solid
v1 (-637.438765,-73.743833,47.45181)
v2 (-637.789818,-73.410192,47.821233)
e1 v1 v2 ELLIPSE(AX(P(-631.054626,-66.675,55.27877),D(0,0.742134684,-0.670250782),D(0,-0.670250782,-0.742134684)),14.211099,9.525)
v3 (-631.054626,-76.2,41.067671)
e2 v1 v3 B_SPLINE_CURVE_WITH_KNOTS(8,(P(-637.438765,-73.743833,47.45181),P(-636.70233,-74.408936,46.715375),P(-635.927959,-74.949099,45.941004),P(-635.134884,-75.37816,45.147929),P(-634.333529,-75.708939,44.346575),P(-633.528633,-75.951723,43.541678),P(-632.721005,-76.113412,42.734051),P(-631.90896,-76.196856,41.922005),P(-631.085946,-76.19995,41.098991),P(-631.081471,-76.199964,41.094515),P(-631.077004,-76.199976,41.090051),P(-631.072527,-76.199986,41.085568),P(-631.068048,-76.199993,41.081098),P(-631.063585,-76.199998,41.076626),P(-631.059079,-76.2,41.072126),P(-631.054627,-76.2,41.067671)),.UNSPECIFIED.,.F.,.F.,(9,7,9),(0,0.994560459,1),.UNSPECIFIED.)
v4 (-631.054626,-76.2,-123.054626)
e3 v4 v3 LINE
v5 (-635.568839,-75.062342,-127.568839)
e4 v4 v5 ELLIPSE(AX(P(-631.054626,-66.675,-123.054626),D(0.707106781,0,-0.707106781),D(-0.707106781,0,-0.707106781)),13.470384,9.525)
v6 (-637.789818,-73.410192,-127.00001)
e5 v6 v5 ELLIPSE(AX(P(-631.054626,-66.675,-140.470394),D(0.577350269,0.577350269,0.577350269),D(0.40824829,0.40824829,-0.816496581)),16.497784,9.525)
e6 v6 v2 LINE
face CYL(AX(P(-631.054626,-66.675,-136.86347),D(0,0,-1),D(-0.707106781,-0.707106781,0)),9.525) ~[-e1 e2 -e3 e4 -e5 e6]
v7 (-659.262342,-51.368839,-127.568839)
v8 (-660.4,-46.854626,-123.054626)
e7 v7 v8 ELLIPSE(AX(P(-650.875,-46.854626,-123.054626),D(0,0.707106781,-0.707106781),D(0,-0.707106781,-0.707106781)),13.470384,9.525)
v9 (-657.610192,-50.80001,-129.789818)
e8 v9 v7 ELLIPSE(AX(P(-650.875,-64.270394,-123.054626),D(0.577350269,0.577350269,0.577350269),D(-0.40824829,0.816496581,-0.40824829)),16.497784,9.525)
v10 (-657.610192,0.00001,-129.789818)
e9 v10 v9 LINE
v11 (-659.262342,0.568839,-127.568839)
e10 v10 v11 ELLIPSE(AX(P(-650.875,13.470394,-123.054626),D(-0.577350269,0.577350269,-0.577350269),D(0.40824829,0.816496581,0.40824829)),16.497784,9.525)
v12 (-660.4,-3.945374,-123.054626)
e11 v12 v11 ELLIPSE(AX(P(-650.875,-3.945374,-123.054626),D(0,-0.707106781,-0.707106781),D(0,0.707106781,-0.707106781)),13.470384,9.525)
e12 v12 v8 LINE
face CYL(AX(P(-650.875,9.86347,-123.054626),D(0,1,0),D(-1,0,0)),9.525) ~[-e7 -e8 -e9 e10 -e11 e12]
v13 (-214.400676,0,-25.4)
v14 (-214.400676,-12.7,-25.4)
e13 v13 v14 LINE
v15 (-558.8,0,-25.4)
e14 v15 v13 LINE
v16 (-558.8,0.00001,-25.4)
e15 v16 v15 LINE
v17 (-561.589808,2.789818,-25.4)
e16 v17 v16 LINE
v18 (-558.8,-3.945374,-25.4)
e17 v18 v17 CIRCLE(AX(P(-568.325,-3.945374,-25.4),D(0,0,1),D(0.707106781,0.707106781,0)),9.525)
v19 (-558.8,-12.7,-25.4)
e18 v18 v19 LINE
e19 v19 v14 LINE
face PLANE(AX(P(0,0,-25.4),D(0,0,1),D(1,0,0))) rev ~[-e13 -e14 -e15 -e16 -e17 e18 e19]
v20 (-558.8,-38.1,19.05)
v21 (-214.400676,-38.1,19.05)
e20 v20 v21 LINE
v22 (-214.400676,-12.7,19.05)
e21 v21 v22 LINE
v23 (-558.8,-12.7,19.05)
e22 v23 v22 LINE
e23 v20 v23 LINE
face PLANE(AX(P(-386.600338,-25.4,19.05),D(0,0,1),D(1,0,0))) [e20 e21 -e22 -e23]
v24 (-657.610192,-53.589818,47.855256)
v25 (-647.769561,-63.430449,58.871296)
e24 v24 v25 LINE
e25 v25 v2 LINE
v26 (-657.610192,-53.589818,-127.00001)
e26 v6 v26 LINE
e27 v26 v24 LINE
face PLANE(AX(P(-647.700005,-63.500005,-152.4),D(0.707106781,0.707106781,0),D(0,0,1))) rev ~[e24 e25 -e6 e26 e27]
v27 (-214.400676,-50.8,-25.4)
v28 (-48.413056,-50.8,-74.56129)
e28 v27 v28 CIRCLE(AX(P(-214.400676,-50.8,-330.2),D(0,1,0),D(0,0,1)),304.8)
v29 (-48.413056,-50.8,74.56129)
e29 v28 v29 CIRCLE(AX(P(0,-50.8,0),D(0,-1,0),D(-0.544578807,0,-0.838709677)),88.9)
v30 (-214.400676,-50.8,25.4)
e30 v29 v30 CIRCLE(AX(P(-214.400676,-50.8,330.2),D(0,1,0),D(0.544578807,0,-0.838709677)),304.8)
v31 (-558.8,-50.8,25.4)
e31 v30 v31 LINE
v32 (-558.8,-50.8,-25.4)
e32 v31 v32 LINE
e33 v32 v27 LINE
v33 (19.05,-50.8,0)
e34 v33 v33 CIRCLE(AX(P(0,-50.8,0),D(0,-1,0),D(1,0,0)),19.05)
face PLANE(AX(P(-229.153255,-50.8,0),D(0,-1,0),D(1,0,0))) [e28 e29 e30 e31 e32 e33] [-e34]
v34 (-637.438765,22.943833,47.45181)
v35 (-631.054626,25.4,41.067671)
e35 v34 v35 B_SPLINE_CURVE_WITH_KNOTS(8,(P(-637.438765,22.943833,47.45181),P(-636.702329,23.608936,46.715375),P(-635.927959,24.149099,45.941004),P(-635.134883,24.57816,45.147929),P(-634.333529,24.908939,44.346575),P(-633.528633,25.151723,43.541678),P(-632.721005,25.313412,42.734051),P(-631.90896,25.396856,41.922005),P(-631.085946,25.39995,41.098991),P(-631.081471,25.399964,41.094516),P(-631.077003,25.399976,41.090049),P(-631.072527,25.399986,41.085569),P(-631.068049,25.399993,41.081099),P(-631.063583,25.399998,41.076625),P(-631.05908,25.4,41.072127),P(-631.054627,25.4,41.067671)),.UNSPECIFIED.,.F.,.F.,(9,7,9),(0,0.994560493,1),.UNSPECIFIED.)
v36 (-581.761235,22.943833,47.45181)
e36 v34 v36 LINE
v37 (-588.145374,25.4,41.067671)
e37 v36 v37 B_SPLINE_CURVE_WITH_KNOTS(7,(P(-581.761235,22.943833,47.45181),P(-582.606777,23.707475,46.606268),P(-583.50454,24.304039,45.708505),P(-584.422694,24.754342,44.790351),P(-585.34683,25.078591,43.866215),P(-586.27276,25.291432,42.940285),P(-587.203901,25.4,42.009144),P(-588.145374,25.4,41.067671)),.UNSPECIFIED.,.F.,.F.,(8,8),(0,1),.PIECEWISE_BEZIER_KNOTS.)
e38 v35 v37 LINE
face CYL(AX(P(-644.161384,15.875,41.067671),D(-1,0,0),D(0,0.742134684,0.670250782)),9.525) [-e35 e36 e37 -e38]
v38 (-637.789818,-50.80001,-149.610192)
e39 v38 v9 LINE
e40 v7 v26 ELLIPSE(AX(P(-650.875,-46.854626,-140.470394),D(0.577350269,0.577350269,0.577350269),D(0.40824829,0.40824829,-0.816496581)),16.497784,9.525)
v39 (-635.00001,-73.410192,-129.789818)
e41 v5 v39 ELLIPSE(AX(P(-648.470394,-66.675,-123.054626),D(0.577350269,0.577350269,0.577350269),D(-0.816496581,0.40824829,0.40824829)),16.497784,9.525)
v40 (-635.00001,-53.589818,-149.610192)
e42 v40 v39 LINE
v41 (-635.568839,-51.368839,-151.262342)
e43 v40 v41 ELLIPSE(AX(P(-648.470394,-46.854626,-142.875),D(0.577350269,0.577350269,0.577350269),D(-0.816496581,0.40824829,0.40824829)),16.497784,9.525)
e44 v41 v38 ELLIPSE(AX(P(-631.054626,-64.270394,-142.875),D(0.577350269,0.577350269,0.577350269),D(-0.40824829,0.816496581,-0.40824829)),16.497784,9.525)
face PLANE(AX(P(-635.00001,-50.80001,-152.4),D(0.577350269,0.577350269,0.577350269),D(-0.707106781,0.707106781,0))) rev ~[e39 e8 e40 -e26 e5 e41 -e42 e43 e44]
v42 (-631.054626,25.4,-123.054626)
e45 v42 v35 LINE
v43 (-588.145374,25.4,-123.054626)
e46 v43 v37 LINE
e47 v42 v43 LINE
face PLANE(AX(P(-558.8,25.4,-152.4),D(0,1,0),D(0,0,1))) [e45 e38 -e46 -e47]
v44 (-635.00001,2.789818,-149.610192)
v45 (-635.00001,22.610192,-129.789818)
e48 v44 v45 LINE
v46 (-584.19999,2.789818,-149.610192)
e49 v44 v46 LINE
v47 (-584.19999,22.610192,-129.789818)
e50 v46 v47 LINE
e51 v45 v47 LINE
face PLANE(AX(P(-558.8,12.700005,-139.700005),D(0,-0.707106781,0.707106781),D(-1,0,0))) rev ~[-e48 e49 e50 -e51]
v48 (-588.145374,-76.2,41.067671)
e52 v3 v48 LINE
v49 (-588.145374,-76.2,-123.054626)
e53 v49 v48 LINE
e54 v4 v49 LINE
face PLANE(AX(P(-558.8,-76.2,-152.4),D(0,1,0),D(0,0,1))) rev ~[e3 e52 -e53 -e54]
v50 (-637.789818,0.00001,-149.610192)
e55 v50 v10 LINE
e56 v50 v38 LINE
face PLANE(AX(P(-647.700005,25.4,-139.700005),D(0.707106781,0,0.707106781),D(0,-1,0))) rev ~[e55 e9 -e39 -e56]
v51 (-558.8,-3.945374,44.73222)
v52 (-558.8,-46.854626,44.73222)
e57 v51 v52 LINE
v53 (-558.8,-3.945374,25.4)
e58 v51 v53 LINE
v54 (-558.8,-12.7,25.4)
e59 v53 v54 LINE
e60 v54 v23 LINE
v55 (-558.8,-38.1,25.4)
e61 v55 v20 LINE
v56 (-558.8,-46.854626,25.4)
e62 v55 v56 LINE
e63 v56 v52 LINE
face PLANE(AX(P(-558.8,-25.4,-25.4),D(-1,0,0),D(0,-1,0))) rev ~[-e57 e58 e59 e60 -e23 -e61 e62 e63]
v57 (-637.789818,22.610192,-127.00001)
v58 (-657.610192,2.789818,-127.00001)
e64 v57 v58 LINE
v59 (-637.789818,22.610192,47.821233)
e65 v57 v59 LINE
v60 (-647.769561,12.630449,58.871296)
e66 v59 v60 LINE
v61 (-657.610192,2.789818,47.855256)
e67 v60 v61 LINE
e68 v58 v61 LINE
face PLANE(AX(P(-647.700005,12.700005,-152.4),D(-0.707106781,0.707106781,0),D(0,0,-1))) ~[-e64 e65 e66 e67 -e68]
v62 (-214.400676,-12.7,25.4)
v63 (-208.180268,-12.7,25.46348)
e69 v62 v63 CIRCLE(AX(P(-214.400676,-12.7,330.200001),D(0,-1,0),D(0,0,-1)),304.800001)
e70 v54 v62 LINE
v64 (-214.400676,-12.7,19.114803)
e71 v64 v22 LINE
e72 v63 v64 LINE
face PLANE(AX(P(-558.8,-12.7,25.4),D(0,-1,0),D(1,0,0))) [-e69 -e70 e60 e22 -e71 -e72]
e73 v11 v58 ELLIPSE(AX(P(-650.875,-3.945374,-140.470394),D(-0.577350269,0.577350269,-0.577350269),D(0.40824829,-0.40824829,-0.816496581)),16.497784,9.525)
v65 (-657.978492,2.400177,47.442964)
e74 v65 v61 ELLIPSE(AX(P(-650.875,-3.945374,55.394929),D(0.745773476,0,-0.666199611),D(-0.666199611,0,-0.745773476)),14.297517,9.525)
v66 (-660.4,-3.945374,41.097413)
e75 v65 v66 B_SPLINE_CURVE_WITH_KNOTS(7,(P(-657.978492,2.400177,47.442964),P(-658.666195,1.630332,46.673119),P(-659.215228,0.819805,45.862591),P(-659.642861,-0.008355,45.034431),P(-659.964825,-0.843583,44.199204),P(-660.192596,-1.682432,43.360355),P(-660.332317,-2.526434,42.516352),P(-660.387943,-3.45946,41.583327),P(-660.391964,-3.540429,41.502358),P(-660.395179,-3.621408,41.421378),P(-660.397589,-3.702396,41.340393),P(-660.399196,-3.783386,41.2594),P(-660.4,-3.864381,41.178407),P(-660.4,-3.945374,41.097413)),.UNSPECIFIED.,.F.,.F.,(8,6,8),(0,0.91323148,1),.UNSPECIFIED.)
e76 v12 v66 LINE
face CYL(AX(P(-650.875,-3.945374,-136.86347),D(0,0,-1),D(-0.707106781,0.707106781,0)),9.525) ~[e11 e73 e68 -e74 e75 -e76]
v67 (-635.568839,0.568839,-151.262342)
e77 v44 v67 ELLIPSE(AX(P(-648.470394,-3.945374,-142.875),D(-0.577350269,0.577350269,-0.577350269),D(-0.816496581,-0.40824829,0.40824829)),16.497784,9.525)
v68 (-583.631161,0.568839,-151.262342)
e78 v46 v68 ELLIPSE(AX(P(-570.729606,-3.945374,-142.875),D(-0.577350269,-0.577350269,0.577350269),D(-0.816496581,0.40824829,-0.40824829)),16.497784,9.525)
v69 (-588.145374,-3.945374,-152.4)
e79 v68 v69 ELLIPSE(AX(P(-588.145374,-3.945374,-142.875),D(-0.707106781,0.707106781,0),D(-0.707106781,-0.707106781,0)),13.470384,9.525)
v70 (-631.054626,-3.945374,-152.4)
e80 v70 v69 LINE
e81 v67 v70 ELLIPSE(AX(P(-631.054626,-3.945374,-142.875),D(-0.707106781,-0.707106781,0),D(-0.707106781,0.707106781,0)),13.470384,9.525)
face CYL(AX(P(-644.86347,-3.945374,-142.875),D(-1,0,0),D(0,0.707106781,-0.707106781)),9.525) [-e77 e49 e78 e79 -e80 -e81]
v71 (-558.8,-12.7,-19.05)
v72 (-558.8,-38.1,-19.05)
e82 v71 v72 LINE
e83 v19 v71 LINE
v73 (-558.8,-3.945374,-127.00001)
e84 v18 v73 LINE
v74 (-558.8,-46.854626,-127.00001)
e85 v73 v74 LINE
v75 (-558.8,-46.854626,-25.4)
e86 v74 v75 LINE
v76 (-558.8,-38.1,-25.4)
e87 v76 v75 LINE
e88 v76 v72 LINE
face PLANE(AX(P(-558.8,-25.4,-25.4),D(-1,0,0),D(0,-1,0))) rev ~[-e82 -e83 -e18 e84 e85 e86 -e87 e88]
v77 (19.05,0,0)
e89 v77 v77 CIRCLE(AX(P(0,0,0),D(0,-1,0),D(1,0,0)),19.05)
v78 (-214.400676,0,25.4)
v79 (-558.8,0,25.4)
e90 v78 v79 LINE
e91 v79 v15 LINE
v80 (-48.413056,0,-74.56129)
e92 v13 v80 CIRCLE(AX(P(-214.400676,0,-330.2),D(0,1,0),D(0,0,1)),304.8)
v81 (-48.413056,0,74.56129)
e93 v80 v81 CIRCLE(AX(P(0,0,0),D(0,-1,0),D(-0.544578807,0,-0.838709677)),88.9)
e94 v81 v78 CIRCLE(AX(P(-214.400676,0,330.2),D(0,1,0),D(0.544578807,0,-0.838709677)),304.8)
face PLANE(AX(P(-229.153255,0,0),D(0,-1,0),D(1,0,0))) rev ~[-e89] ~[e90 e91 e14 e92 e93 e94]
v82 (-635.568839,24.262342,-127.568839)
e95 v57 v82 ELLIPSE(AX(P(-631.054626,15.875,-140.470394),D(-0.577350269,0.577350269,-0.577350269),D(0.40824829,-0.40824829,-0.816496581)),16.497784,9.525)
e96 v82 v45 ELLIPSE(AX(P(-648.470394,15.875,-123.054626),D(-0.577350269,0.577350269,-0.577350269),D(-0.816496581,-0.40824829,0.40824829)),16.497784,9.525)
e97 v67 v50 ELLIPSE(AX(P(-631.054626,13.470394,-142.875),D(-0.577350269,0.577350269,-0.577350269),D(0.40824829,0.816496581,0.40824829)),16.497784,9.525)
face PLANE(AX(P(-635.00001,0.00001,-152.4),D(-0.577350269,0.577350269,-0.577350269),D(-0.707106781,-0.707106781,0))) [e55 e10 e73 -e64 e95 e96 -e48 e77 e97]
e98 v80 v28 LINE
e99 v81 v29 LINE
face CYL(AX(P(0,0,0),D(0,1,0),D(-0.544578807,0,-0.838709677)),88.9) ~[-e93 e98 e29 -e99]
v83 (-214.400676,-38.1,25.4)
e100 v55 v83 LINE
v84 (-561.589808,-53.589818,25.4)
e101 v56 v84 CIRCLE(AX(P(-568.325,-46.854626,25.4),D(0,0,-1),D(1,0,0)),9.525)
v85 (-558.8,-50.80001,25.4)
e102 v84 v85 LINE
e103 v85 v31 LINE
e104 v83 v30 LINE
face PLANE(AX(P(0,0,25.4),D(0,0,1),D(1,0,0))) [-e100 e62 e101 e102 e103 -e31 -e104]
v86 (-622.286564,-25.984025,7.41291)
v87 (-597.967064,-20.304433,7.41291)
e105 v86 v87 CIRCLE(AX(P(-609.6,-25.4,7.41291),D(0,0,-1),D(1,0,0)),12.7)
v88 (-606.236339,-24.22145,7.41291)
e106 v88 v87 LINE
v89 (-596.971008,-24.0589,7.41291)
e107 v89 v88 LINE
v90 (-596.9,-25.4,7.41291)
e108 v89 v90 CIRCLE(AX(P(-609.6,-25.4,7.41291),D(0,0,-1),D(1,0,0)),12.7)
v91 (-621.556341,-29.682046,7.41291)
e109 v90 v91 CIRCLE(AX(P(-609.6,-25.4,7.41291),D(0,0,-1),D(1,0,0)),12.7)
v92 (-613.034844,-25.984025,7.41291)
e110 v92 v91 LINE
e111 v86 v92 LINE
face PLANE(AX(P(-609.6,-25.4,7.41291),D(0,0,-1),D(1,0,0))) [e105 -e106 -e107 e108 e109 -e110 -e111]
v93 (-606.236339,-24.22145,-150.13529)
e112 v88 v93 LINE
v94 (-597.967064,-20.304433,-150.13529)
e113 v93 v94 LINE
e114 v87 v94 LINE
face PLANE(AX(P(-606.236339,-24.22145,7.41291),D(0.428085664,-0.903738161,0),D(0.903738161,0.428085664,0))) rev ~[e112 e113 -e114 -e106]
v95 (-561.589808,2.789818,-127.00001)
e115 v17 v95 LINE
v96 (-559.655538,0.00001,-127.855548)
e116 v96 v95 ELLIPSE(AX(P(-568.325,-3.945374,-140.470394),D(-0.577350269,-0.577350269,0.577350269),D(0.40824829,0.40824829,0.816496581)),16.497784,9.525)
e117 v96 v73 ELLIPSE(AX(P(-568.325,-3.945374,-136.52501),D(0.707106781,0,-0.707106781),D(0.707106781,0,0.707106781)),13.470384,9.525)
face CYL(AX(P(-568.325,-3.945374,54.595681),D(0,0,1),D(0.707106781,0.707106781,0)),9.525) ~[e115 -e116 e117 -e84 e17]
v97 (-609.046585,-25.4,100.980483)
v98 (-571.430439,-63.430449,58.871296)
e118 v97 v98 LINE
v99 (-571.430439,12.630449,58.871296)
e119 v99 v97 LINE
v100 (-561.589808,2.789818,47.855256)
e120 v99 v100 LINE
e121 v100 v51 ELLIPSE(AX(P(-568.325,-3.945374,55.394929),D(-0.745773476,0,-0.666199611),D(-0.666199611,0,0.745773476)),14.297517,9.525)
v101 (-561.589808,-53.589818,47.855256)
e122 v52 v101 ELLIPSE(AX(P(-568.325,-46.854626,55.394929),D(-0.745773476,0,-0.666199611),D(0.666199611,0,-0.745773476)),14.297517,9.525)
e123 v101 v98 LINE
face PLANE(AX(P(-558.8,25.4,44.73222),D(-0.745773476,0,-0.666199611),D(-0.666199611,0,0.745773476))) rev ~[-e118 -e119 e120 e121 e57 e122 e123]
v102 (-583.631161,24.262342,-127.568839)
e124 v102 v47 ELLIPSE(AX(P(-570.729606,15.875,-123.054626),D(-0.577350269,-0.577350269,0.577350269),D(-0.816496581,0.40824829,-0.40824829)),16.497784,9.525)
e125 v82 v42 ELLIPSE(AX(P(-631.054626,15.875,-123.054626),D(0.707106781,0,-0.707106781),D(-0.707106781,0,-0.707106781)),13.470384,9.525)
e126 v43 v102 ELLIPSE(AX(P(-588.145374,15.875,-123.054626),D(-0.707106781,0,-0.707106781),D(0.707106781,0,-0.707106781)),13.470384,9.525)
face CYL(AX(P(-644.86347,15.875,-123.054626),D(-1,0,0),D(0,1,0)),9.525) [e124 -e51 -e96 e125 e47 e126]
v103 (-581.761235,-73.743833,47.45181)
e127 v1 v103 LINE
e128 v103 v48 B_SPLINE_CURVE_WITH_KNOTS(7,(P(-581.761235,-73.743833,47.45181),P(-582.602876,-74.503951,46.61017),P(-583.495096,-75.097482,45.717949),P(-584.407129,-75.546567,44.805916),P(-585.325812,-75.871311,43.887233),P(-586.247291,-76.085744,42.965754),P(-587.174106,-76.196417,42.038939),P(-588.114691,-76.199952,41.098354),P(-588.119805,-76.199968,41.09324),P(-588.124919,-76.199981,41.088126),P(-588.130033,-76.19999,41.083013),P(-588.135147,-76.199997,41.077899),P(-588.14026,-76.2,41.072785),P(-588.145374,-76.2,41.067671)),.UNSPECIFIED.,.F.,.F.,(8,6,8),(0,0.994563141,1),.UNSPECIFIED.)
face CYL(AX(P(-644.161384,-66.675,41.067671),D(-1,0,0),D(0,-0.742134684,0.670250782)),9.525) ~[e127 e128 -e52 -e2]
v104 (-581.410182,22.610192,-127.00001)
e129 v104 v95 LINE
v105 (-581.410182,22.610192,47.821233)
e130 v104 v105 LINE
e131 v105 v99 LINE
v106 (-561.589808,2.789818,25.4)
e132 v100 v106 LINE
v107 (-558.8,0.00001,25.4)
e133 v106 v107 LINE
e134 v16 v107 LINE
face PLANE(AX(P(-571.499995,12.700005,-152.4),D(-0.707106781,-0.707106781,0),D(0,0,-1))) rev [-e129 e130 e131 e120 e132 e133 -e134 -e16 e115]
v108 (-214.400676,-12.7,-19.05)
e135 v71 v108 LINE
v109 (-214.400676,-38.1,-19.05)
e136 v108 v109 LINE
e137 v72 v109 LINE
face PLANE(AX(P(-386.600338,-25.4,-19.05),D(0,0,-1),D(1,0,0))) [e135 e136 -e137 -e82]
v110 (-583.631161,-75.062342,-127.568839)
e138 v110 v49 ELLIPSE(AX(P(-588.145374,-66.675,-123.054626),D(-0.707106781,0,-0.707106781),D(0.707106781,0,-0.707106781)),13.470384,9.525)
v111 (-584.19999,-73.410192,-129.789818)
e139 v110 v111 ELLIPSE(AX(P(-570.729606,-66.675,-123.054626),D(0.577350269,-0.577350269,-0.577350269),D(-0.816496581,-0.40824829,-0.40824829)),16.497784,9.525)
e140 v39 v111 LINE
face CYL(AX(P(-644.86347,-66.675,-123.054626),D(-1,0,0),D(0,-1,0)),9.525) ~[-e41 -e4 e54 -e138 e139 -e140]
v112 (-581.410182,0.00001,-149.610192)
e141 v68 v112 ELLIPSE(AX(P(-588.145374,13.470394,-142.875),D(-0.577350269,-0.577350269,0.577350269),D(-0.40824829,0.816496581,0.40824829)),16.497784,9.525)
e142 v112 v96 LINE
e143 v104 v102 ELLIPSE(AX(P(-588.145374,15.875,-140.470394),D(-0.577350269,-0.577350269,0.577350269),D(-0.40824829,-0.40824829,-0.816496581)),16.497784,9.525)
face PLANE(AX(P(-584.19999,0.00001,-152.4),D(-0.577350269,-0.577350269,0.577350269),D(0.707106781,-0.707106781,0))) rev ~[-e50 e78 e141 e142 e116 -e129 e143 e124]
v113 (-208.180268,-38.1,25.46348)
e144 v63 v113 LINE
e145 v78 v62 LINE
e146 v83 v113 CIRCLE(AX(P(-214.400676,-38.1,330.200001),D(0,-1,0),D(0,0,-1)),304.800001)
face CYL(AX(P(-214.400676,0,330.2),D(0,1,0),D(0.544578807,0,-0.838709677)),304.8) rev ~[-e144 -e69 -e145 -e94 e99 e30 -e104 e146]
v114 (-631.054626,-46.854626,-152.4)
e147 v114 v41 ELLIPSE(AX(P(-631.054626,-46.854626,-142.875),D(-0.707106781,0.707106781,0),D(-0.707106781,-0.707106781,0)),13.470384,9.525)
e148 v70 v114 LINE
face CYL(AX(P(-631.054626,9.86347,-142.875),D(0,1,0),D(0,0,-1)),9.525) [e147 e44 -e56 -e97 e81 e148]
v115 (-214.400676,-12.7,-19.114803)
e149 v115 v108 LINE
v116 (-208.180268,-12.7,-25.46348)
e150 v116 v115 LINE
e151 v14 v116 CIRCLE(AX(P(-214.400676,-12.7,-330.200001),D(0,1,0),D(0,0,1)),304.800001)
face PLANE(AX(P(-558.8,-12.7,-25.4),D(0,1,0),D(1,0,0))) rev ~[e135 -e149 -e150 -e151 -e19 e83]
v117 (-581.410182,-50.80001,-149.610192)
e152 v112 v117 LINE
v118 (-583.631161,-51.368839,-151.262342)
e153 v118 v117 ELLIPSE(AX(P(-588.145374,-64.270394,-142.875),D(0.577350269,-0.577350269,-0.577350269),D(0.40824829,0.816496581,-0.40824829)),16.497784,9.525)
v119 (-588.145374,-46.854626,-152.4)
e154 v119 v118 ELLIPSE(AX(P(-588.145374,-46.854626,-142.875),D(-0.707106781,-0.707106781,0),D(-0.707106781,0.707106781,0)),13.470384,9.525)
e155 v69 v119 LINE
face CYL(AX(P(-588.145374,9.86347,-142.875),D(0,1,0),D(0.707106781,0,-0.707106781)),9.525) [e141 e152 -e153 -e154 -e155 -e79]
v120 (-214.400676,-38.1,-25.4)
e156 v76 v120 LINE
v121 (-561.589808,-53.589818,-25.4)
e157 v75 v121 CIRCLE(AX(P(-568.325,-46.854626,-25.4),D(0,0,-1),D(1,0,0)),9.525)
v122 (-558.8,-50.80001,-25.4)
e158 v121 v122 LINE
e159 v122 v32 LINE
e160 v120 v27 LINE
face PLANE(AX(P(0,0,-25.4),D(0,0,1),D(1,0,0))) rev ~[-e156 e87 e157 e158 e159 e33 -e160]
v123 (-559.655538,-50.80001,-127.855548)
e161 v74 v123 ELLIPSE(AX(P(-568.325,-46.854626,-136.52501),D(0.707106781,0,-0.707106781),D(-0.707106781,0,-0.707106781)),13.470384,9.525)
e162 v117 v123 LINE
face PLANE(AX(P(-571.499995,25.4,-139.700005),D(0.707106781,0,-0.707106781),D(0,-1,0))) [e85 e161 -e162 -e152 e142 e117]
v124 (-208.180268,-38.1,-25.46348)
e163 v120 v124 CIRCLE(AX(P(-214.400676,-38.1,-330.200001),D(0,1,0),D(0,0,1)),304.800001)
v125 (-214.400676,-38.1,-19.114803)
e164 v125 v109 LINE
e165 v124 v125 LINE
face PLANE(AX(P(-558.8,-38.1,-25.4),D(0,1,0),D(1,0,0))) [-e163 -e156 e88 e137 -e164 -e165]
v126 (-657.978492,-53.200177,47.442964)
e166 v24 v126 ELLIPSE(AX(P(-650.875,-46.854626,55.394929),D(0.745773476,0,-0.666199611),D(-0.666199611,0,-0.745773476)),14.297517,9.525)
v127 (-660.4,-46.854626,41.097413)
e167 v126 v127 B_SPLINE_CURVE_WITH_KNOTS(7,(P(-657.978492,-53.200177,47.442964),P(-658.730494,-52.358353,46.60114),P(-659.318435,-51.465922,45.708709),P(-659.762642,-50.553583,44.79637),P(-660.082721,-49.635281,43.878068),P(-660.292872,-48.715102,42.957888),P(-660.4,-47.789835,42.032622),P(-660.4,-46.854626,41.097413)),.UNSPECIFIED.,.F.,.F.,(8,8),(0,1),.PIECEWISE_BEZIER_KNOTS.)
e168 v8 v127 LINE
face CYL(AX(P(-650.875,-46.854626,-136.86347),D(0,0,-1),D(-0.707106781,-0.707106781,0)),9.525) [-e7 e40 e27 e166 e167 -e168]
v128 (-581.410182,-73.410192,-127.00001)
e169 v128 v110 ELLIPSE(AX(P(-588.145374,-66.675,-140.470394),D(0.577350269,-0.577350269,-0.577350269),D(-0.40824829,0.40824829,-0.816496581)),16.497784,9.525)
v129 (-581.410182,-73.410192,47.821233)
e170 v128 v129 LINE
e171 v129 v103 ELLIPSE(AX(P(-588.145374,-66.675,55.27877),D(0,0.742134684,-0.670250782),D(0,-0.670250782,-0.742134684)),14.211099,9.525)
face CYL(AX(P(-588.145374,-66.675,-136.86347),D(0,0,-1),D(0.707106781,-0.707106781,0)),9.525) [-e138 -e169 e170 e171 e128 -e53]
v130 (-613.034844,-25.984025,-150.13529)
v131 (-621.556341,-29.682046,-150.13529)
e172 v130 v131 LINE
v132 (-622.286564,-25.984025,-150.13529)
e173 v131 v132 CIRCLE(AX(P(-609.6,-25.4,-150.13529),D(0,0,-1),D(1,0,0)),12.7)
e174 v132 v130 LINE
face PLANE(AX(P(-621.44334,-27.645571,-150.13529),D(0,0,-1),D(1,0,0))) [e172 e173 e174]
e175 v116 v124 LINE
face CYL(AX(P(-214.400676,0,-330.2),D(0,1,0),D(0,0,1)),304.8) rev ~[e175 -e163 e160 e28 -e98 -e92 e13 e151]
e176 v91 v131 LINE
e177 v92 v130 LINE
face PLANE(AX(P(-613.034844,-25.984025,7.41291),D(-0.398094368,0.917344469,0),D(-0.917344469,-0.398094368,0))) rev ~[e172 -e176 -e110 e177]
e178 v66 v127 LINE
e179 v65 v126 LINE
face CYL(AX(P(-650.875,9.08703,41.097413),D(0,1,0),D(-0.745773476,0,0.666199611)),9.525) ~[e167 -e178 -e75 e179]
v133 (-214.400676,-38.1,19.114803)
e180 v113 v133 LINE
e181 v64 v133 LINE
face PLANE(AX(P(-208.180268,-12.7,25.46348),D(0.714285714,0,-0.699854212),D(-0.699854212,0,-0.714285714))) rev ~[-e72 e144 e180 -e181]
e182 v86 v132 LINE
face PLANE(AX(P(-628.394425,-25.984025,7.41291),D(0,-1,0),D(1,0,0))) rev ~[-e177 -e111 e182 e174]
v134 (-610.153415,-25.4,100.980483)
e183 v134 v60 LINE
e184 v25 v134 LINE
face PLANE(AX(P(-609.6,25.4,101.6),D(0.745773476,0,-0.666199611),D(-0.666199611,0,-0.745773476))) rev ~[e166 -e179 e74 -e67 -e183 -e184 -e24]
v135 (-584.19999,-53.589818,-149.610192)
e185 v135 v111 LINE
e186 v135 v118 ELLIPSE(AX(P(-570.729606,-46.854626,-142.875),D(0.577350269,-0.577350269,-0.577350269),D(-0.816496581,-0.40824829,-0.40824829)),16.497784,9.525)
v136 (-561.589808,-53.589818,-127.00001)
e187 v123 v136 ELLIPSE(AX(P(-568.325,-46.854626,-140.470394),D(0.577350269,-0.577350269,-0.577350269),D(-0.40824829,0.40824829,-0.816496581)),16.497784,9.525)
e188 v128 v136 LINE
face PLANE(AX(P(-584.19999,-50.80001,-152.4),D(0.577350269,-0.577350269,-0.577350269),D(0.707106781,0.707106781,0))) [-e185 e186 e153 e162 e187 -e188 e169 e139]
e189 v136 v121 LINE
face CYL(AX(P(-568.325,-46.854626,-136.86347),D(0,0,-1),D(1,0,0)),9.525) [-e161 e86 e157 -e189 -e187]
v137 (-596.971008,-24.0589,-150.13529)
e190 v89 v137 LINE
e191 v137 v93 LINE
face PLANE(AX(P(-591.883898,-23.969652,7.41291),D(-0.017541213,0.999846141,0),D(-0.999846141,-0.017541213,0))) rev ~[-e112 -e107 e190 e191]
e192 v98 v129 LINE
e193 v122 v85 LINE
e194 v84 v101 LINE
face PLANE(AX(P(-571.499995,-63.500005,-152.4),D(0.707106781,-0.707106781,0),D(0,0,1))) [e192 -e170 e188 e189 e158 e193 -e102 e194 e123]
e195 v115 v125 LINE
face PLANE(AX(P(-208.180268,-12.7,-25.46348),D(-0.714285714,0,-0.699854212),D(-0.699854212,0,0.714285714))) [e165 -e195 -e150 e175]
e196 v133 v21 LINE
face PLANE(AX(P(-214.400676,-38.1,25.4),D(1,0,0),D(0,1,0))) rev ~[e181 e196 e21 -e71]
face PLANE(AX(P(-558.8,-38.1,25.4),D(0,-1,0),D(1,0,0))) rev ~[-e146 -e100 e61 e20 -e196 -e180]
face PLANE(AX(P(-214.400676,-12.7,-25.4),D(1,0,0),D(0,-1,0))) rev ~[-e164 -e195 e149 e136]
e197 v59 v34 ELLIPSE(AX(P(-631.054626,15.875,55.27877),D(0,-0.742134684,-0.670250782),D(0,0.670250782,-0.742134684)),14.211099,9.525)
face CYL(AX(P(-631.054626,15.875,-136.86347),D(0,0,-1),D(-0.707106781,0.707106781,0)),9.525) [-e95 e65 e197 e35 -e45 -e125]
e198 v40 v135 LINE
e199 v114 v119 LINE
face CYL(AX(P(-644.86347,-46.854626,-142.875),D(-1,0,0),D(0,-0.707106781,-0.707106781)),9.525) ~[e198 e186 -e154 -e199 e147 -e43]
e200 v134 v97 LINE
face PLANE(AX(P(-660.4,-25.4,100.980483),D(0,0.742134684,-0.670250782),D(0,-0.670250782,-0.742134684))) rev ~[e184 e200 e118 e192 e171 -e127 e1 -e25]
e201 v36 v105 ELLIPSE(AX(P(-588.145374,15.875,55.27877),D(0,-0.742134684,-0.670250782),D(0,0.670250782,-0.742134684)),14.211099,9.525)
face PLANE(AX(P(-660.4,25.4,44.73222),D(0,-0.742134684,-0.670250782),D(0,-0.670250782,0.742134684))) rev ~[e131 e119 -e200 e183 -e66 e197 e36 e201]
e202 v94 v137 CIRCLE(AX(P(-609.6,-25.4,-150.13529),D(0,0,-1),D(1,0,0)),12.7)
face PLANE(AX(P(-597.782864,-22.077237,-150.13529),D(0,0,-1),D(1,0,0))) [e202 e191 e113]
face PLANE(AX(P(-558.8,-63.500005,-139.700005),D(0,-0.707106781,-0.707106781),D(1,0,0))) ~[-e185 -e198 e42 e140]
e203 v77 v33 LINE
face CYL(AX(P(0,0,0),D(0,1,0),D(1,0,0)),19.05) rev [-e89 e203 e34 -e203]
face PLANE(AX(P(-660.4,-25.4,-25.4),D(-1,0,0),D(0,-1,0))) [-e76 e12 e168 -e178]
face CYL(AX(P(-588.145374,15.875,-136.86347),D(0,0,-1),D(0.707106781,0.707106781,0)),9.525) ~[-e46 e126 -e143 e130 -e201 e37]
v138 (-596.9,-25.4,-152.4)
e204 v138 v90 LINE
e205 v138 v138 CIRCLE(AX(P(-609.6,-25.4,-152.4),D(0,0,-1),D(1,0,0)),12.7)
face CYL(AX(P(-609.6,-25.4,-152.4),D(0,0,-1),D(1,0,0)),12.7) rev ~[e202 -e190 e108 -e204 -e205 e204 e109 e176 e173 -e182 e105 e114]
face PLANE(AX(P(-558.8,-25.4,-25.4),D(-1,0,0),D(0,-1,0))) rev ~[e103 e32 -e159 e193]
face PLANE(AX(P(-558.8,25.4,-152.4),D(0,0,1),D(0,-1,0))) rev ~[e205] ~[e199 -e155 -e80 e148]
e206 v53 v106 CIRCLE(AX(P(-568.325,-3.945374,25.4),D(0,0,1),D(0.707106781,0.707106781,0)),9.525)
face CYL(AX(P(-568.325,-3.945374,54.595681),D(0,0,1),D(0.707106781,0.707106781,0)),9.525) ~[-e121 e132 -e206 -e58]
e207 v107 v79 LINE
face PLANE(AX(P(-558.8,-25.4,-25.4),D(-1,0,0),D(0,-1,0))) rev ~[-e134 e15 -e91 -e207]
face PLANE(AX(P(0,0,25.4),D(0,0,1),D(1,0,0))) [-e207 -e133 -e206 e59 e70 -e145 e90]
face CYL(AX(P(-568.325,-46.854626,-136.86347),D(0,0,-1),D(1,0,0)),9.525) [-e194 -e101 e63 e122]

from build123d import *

# Parameters (mm, degrees)
F0_R          = 19.05
F1_DEPTH      = 50.8
F2_W          = 101.6
F2_H          = 254
F3_DEPTH      = 101.6
F5_DEPTH      = 150.00483
F7_DEPTH      = 133.96625
F8_SIZE       = 25.39999
F9_T1_DEPTH   = 70.526940908
F9_T3_DEPTH   = 70.526940908
F10_T1_DEPTH  = 69.1227672529
F10_T3_DEPTH  = 191.4591513789
F10_T5_DEPTH  = 70.526940908
F10_T7_DEPTH  = 68.974059705
F10_T9_DEPTH  = 70.526940908
F11_T4_DEPTH  = 191.4591513789
F11_T9_DEPTH  = 191.4591513789
F11_T14_DEPTH = 191.4591513789
F11_T19_DEPTH = 191.4591513789
F13_R         = 12.7
F14_DEPTH     = 159.81291
F15_W         = 344.3993236951
F15_H         = 25.4
F16_DEPTH     = 6.35
F17_W         = 344.3993236951
F17_H         = 25.4
F18_DEPTH     = 6.35
F19_T1_DEPTH  = 25.4
F21_DEPTH     = 157.5482


# Not quite as in the source:
# - a fillet or chamfer that OpenCascade refuses, or shapes differently, is made with other operations: its cross-section is extruded or revolved along the edge and cut away or added
# - a fillet or chamfer is up to 0.001 mm smaller than in the source, because OpenCascade refuses the exact size
# - a feature of the source that left no trace in its solid (it failed there, or was rolled back) is left out


with BuildPart() as f1:
    # F0 (on Front) → F1 (new body)
    with BuildSketch(Plane.XZ):
        with BuildLine():
            ThreePointArc((-214.4006763049, -25.4), (-127.8432927657, -37.9486366929), (-48.4130559398, -74.5612903226))
            ThreePointArc((-48.4130559398, -74.5612903226), (88.9, 0), (-48.4130559398, 74.5612903226))
            ThreePointArc((-48.4130559398, 74.5612903226), (-127.8432927657, 37.9486366929), (-214.4006763049, 25.4))
            Line((-214.4006763049, 25.4), (-558.8, 25.4))
            Line((-558.8, 25.4), (-558.8, -25.4))
            Line((-558.8, -25.4), (-214.4006763049, -25.4))
        make_face()
        Circle(F0_R, mode=Mode.SUBTRACT)
    extrude(amount=F1_DEPTH)

    # F2 (on face) → F3 (join)
    with BuildSketch(Plane(origin=(-558.8, 0, 0), x_dir=(0, -1, 0), z_dir=(-1, 0, 0))):
        with Locations((25.4, -25.4)):
            Rectangle(F2_W, F2_H)
    extrude(amount=F3_DEPTH)

    # F4 (on face) → F5 (cut)
    with BuildSketch(Plane(origin=(0, 25.4, 0), x_dir=(-1, 0, 0), z_dir=(0, 1, 0))):
        Polygon((534.5858503342, 124.7548833489), (558.8, 44.7322204709), (609.6, 101.6), (660.4, 44.7322204709), (660.4, 124.7548833489), align=None)
    extrude(amount=-F5_DEPTH, mode=Mode.SUBTRACT)

    # F6 (on face) → F7 (cut)
    with BuildSketch(Plane(origin=(-660.4, 0, 0), x_dir=(0, -1, 0), z_dir=(-1, 0, 0))):
        Polygon((-36.009144038, 107.4853688478), (-25.4, 44.7322204709), (25.4, 100.9804829955), (76.2, 44.7322204709), (85.7249945402, 107.4853688478), align=None)
    extrude(amount=-F7_DEPTH, mode=Mode.SUBTRACT)

    # F8 (size 25.4 in the source; OpenCascade refuses exactly that, so slightly less here)
    f8_edges = [f1.edges().sort_by_distance(p)[0] for p in [
        (-660.4, -76.2, -53.83389),
        (-558.8, -76.2, -53.83389),
        (-558.8, 25.4, -53.83389),
        (-660.4, 25.4, -53.83389),
        (-609.6, 25.4, -152.4),
        (-609.6, -76.2, -152.4),
        (-558.8, -25.4, -152.4),
        (-660.4, -25.4, -152.4),
    ]]
    chamfer(f8_edges, length=F8_SIZE)

    # F9: fillet of radius 9.525 on 4 edges, made by hand

    # F9_s2 → F9_t1 (cut)
    with BuildSketch(Plane.YZ.offset(-644.863470454)):
        with BuildLine():
            ThreePointArc((2.7898179092, -149.6101920908), (-0.3003144883, -151.6749525472), (-3.9453741816, -152.4))
            Line((-3.9453741816, -152.4), (1e-05, -152.4))
            Line((1e-05, -152.4), (2.7898179092, -149.6101920908))
        make_face()
        with BuildLine():
            ThreePointArc((-53.5898179092, -149.6101920908), (-50.4996855117, -151.6749525472), (-46.8546258184, -152.4))
            Line((-46.8546258184, -152.4), (-50.80001, -152.4))
            Line((-50.80001, -152.4), (-53.5898179092, -149.6101920908))
        make_face()
    extrude(amount=F9_T1_DEPTH, mode=Mode.SUBTRACT)

    # F9_s4 → F9_t3 (cut)
    with BuildSketch(Plane.XZ.offset(-9.863470454)):
        with BuildLine():
            ThreePointArc((-581.4101820908, -149.6101920908), (-584.5003144883, -151.6749525472), (-588.1453741816, -152.4))
            Line((-588.1453741816, -152.4), (-584.19999, -152.4))
            Line((-584.19999, -152.4), (-581.4101820908, -149.6101920908))
        make_face()
        with BuildLine():
            ThreePointArc((-631.0546258184, -152.4), (-634.6996855117, -151.6749525472), (-637.7898179092, -149.6101920908))
            Line((-637.7898179092, -149.6101920908), (-635.00001, -152.4))
            Line((-635.00001, -152.4), (-631.0546258184, -152.4))
        make_face()
    extrude(amount=F9_T3_DEPTH, mode=Mode.SUBTRACT)

    # F10: fillet of radius 9.525 on 12 edges, made by hand

    # F10_s2 → F10_t1 (cut)
    with BuildSketch(Plane.YZ.offset(-644.1613836265)):
        with BuildLine():
            ThreePointArc((-73.7438328649, 47.4518097193), (-75.5647766574, 44.4878312477), (-76.2, 41.0676710203))
            Line((-76.2, 41.0676710203), (-76.2, 44.7322204709))
            Line((-76.2, 44.7322204709), (-73.7438328649, 47.4518097193))
        make_face()
        with BuildLine():
            ThreePointArc((22.9438328649, 47.4518097193), (24.7647766574, 44.4878312477), (25.4, 41.0676710203))
            Line((25.4, 41.0676710203), (25.4, 44.7322204709))
            Line((25.4, 44.7322204709), (22.9438328649, 47.4518097193))
        make_face()
    extrude(amount=F10_T1_DEPTH, mode=Mode.SUBTRACT)

    # F10_s4 → F10_t3 (cut)
    with BuildSketch(Plane.XY.offset(-136.863470454)):
        with BuildLine():
            ThreePointArc((-637.7898179092, -73.4101920908), (-634.6996855117, -75.4749525472), (-631.0546258184, -76.2))
            Line((-631.0546258184, -76.2), (-635.00001, -76.2))
            Line((-635.00001, -76.2), (-637.7898179092, -73.4101920908))
        make_face()
        with BuildLine():
            ThreePointArc((-581.4101820908, -73.4101920908), (-584.5003144883, -75.4749525472), (-588.1453741816, -76.2))
            Line((-588.1453741816, -76.2), (-584.19999, -76.2))
            Line((-584.19999, -76.2), (-581.4101820908, -73.4101920908))
        make_face()
        with BuildLine():
            ThreePointArc((-637.7898179092, 22.6101920908), (-634.6996855117, 24.6749525472), (-631.0546258184, 25.4))
            Line((-631.0546258184, 25.4), (-635.00001, 25.4))
            Line((-635.00001, 25.4), (-637.7898179092, 22.6101920908))
        make_face()
        with BuildLine():
            ThreePointArc((-581.4101820908, 22.6101920908), (-584.5003144883, 24.6749525472), (-588.1453741816, 25.4))
            Line((-588.1453741816, 25.4), (-584.19999, 25.4))
            Line((-584.19999, 25.4), (-581.4101820908, 22.6101920908))
        make_face()
        with BuildLine():
            ThreePointArc((-657.6101920908, 2.7898179092), (-659.6749525472, -0.3003144883), (-660.4, -3.9453741816))
            Line((-660.4, -3.9453741816), (-660.4, 1e-05))
            Line((-660.4, 1e-05), (-657.6101920908, 2.7898179092))
        make_face()
        with BuildLine():
            ThreePointArc((-657.6101920908, -53.5898179092), (-659.6749525472, -50.4996855117), (-660.4, -46.8546258184))
            Line((-660.4, -46.8546258184), (-660.4, -50.80001))
            Line((-660.4, -50.80001), (-657.6101920908, -53.5898179092))
        make_face()
    extrude(amount=F10_T3_DEPTH, mode=Mode.SUBTRACT)

    # F10_s6 → F10_t5 (cut)
    with BuildSketch(Plane.YZ.offset(-644.863470454)):
        with BuildLine():
            ThreePointArc((-76.2, -123.0546258184), (-75.4749525472, -126.6996855117), (-73.4101920908, -129.7898179092))
            Line((-73.4101920908, -129.7898179092), (-76.2, -127.00001))
            Line((-76.2, -127.00001), (-76.2, -123.0546258184))
        make_face()
        with BuildLine():
            ThreePointArc((25.4, -123.0546258184), (24.6749525472, -126.6996855117), (22.6101920908, -129.7898179092))
            Line((22.6101920908, -129.7898179092), (25.4, -127.00001))
            Line((25.4, -127.00001), (25.4, -123.0546258184))
        make_face()
    extrude(amount=F10_T5_DEPTH, mode=Mode.SUBTRACT)

    # F10_s8 → F10_t7 (cut)
    with BuildSketch(Plane.XZ.offset(-9.0870298525)):
        with BuildLine():
            ThreePointArc((-657.9784923634, 47.4429638254), (-659.7740558421, 44.4933557154), (-660.4, 41.0974125299))
            Line((-660.4, 41.0974125299), (-660.4, 44.7322204709))
            Line((-660.4, 44.7322204709), (-657.9784923634, 47.4429638254))
        make_face()
    extrude(amount=F10_T7_DEPTH, mode=Mode.SUBTRACT)

    # F10_s10 → F10_t9 (cut)
    with BuildSketch(Plane.XZ.offset(-9.863470454)):
        with BuildLine():
            ThreePointArc((-660.4, -123.0546258184), (-659.6749525472, -126.6996855117), (-657.6101920908, -129.7898179092))
            Line((-657.6101920908, -129.7898179092), (-660.4, -127.00001))
            Line((-660.4, -127.00001), (-660.4, -123.0546258184))
        make_face()
    extrude(amount=F10_T9_DEPTH, mode=Mode.SUBTRACT)

    # F11: fillet of radius 9.525 on 2 edges, made by hand


with BuildPart() as f11_tool2:
    # F11_s3 → F11_t4 (new body)
    with BuildSketch(Plane.XY.offset(-136.863470454)):
        with BuildLine():
            ThreePointArc((-558.8, -46.8546258184), (-559.5250474528, -50.4996855117), (-561.5898079092, -53.5898179092))
            Line((-561.5898079092, -53.5898179092), (-558.8, -50.80001))
            Line((-558.8, -50.80001), (-558.8, -46.8546258184))
        make_face()
    extrude(amount=F11_T4_DEPTH)

    split(bisect_by=Plane.XY.offset(-25.4), keep=Keep.BOTTOM)


with BuildPart() as f1_1:
    add(f1.part)

    # F11_t1: cut F11_tool2
    add(f11_tool2.part, mode=Mode.SUBTRACT)


with BuildPart() as f11_tool7:
    # F11_s8 → F11_t9 (new body)
    with BuildSketch(Plane.XY.offset(-136.863470454)):
        with BuildLine():
            ThreePointArc((-558.8, -46.8546258184), (-559.5250474528, -50.4996855117), (-561.5898079092, -53.5898179092))
            Line((-561.5898079092, -53.5898179092), (-558.8, -50.80001))
            Line((-558.8, -50.80001), (-558.8, -46.8546258184))
        make_face()
    extrude(amount=F11_T9_DEPTH)

    split(bisect_by=Plane.XY.offset(25.4), keep=Keep.TOP)


with BuildPart() as f1_2:
    add(f1_1.part)

    # F11_t6: cut F11_tool7
    add(f11_tool7.part, mode=Mode.SUBTRACT)


with BuildPart() as f11_tool12:
    # F11_s13 → F11_t14 (new body)
    with BuildSketch(Plane.XY.offset(54.5956809249)):
        with BuildLine():
            ThreePointArc((-561.5898079092, 2.7898179092), (-559.5250474528, -0.3003144883), (-558.8, -3.9453741816))
            Line((-558.8, -3.9453741816), (-558.8, 1e-05))
            Line((-558.8, 1e-05), (-561.5898079092, 2.7898179092))
        make_face()
    extrude(amount=-F11_T14_DEPTH)

    split(bisect_by=Plane.XY.offset(25.4), keep=Keep.TOP)


with BuildPart() as f1_3:
    add(f1_2.part)

    # F11_t11: cut F11_tool12
    add(f11_tool12.part, mode=Mode.SUBTRACT)


with BuildPart() as f11_tool17:
    # F11_s18 → F11_t19 (new body)
    with BuildSketch(Plane.XY.offset(54.5956809249)):
        with BuildLine():
            ThreePointArc((-561.5898079092, 2.7898179092), (-559.5250474528, -0.3003144883), (-558.8, -3.9453741816))
            Line((-558.8, -3.9453741816), (-558.8, 1e-05))
            Line((-558.8, 1e-05), (-561.5898079092, 2.7898179092))
        make_face()
    extrude(amount=-F11_T19_DEPTH)

    split(bisect_by=Plane.XY.offset(-25.4), keep=Keep.BOTTOM)


with BuildPart() as f1_4:
    add(f1_3.part)

    # F11_t16: cut F11_tool17
    add(f11_tool17.part, mode=Mode.SUBTRACT)

    # F13 (on face) → F14 (cut)
    with BuildSketch(Plane(origin=(0, 0, -152.4), x_dir=(1, 0, 0), z_dir=(0, 0, -1))):
        with Locations((-609.6, 25.4)):
            Circle(F13_R)
    extrude(amount=-F14_DEPTH, mode=Mode.SUBTRACT)

    # F15 (on face) → F16 (cut)
    with BuildSketch(Plane.XY.offset(25.4)):
        with Locations((-386.6003381525, -25.4)):
            Rectangle(F15_W, F15_H)
    extrude(amount=-F16_DEPTH, mode=Mode.SUBTRACT)

    # F17 (on face) → F18 (cut)
    with BuildSketch(Plane(origin=(0, 0, -25.4), x_dir=(1, 0, 0), z_dir=(0, 0, -1))):
        with Locations((-386.6003381525, 25.4)):
            Rectangle(F17_W, F17_H)
    extrude(amount=-F18_DEPTH, mode=Mode.SUBTRACT)

    # F19: chamfer of 6.35 on 6 edges, made by hand

    # F19_s2 → F19_t1 (cut)
    with BuildSketch(Plane.XZ.offset(12.7)):
        with BuildLine():
            Line((-208.1802681416, -25.4634801631), (-214.4006763049, -19.1148026665))
            Line((-214.4006763049, -19.1148026665), (-214.4006763049, -25.4))
            ThreePointArc((-214.4006763049, -25.4), (-211.2004813817, -25.4168004098), (-208.1802681416, -25.4634801631))
        make_face()
        with BuildLine():
            Line((-208.1802681416, 25.4634801631), (-214.4006763049, 19.1148026665))
            Line((-214.4006763049, 19.1148026665), (-214.4006763049, 25.4))
            ThreePointArc((-214.4006763049, 25.4), (-211.2004813817, 25.4168004098), (-208.1802681416, 25.4634801631))
        make_face()
    extrude(amount=F19_T1_DEPTH, mode=Mode.SUBTRACT)

    # F20 (on face) → F21 (join)
    with BuildSketch(Plane(origin=(0, 0, 7.41291), x_dir=(1, 0, 0), z_dir=(0, 0, -1))):
        Polygon((-613.0348443985, 25.984024629), (-626.3800263405, 31.7753516138), (-628.3944249153, 25.984024629), align=None)
        Polygon((-591.8838977814, 23.9696521312), (-606.2363386154, 24.2214500904), (-591.8838977814, 17.4229387194), align=None)
    extrude(amount=F21_DEPTH)


solid = f1_4.part
